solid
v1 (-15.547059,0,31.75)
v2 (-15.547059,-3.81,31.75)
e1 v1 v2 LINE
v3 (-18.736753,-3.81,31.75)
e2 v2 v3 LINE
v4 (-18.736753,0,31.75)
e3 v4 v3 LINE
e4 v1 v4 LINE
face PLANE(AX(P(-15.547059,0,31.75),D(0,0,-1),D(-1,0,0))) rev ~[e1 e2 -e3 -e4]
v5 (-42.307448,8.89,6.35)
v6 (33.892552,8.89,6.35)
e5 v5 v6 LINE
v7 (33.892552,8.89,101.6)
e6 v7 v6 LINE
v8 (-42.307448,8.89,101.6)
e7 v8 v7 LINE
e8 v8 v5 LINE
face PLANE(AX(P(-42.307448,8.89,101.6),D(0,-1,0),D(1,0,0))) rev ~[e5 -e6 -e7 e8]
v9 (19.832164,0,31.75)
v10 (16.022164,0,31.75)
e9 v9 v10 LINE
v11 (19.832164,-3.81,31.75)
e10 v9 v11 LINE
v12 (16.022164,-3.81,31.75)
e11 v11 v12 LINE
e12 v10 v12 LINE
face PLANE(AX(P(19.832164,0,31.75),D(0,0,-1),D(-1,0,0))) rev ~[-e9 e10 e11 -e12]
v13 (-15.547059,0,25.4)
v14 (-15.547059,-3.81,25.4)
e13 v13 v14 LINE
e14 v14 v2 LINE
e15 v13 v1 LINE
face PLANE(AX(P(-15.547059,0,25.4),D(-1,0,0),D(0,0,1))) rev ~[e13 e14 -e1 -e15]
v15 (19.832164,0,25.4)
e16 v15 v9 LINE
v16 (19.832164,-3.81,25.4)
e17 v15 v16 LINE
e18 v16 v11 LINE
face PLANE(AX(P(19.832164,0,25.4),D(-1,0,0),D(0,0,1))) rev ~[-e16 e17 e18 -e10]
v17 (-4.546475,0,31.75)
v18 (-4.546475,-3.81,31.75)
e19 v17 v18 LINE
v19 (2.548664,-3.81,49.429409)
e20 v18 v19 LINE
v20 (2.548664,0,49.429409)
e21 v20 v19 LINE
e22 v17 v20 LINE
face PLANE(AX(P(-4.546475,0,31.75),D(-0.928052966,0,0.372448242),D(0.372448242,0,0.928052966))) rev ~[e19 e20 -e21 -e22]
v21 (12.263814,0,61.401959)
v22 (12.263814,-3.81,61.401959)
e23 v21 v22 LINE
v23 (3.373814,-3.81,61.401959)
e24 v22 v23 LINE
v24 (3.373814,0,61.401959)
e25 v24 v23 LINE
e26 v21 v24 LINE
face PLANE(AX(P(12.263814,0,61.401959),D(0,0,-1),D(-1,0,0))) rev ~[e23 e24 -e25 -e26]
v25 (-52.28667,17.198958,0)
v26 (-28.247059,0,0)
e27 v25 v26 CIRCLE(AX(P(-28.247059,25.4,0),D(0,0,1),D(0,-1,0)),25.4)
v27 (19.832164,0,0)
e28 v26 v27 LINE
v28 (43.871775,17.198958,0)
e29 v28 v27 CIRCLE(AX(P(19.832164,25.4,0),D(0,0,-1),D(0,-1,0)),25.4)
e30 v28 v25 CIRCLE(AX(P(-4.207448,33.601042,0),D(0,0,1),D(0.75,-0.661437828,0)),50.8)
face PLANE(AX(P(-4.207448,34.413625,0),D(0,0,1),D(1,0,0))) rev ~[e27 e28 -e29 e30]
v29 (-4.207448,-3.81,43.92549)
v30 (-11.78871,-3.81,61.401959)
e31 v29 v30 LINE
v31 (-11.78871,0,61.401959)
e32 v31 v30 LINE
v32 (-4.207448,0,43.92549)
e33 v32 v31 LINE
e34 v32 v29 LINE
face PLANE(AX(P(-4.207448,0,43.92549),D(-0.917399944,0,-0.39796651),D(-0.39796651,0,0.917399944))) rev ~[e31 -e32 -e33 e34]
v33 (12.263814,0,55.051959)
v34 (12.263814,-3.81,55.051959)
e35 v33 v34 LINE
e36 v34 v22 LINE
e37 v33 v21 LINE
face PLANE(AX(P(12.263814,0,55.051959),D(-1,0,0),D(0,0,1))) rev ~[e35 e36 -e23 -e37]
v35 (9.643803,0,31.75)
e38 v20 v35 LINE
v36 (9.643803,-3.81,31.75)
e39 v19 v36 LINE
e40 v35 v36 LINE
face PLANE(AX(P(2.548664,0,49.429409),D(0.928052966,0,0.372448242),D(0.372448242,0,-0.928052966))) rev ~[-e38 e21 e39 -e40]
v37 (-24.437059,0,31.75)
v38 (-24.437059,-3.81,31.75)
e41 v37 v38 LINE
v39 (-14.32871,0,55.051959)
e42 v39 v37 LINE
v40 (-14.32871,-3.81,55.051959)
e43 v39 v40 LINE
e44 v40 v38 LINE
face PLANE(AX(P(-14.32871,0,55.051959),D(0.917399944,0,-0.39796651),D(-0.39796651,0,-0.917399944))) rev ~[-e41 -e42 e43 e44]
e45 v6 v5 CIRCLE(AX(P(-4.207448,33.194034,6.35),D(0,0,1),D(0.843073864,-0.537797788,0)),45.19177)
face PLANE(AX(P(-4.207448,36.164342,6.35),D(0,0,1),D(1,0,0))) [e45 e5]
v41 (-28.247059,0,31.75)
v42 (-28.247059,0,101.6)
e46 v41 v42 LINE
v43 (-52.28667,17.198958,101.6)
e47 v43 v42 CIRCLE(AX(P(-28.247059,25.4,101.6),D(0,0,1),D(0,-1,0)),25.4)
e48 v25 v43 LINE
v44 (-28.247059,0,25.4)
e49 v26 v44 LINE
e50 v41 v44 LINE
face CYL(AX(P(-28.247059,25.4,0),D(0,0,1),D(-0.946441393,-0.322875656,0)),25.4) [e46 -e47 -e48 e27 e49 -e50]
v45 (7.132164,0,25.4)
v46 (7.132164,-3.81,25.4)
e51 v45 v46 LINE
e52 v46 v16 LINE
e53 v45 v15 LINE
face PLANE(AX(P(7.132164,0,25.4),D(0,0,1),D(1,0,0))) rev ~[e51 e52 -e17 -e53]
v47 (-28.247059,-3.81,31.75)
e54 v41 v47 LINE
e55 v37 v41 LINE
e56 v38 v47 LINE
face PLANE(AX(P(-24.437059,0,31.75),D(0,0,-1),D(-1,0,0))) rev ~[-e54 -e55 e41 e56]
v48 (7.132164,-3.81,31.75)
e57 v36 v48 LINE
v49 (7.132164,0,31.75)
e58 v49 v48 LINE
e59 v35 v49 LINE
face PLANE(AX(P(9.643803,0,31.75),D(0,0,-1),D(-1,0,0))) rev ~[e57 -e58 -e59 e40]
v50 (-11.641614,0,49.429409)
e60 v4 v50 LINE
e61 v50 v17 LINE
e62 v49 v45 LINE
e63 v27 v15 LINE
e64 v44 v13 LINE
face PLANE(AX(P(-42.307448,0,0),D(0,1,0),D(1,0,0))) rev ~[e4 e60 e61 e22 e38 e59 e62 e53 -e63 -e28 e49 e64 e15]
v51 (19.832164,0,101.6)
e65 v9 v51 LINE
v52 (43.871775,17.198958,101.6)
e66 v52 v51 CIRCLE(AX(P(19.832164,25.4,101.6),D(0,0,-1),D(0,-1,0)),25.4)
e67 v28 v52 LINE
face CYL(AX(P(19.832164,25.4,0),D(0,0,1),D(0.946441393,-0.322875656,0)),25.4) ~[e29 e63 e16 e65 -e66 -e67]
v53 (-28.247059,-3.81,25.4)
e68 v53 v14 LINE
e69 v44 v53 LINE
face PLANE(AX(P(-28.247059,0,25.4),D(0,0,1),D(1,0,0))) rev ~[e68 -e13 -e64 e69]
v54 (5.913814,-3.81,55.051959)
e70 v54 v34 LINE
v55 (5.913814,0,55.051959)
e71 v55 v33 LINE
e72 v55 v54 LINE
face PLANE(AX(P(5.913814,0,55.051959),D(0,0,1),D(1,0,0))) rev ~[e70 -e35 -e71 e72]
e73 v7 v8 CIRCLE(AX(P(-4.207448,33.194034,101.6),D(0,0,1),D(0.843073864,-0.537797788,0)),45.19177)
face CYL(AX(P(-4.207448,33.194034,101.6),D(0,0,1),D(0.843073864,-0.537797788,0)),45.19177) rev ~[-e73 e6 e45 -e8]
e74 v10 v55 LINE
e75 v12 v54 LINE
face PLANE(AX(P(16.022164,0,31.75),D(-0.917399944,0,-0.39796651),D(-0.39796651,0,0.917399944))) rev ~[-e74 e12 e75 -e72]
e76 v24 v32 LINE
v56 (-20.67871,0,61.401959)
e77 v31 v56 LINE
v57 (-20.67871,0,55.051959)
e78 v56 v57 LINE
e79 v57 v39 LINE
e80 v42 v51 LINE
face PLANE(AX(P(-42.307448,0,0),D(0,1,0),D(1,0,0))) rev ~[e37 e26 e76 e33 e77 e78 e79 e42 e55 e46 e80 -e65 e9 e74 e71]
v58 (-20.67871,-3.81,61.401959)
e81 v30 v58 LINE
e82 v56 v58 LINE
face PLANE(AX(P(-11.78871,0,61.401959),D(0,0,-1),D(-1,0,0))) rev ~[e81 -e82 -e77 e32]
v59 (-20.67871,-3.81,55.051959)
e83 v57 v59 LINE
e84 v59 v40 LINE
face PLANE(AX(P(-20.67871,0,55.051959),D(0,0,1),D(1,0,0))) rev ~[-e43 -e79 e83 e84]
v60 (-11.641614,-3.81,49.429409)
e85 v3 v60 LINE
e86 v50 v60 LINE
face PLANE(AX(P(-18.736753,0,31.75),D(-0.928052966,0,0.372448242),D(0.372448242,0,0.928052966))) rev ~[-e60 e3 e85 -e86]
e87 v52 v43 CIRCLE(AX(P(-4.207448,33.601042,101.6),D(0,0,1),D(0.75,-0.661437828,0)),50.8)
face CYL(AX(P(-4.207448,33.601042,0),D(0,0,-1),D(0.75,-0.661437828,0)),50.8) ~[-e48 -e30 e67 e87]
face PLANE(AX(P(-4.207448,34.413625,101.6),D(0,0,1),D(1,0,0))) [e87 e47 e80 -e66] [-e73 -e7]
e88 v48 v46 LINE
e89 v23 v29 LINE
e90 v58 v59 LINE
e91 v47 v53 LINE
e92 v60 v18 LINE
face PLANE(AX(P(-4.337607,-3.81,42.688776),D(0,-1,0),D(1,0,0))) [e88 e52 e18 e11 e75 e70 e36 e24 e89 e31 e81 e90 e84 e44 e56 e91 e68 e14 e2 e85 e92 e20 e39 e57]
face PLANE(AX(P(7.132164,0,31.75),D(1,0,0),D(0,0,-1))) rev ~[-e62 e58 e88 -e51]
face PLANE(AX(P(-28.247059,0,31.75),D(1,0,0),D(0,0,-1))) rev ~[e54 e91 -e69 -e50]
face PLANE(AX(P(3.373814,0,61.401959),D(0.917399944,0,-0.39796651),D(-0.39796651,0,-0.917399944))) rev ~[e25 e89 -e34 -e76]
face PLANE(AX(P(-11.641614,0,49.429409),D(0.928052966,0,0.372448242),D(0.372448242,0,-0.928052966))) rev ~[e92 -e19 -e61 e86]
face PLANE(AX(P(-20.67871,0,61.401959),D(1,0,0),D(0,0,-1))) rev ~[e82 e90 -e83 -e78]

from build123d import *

# Parameters (mm, degrees)
F1_DEPTH = 101.6
F3_DEPTH = 95.25
F4_R     = 25.4
F6_DEPTH = 3.81


# Not quite as in the source:
# - a feature names something its author has since deleted; it is built from what else it names


with BuildPart() as f1:
    # F0 (on Top) → F1 (new body)
    with BuildSketch(Plane.XY):
        with BuildLine():
            ThreePointArc((33.8925523579, 0), (-4.2074476421, 84.4010416505), (-42.3074476421, 0))
            Line((-42.3074476421, 0), (33.8925523579, 0))
        make_face()
    extrude(amount=F1_DEPTH)

    # F2 (on face) → F3 (cut)
    with BuildSketch(Plane.XY.offset(101.6)):
        with BuildLine():
            ThreePointArc((33.8925523579, 8.89), (-4.2074476421, 78.3858036913), (-42.3074476421, 8.89))
            Line((-42.3074476421, 8.89), (33.8925523579, 8.89))
        make_face()
    extrude(amount=-F3_DEPTH, mode=Mode.SUBTRACT)

    # F4
    f4_edges = [f1.edges().sort_by_distance(p)[0] for p in [
        (-42.307448, 0, 50.8),
        (33.892552, 0, 50.8),
    ]]
    fillet(f4_edges, radius=F4_R)

    # F5 (on face) → F6 (join)
    with BuildSketch(Plane.XZ):
        Polygon((-28.2470590334, 31.75), (-28.2470590334, 25.4), (-15.5470590334, 25.4), (-15.5470590334, 31.75), (-18.7367527627, 31.75), (-11.6416137586, 49.4294089978), (-4.5464747545, 31.75), (2.5486642496, 49.4294089978), (9.6438032537, 31.75), (7.1321637492, 31.75), (7.1321637492, 25.4), (19.8321637492, 25.4), (19.8321637492, 31.75), (16.0221637492, 31.75), (5.9138143828, 55.0519585676), (12.2638143828, 55.0519585676), (12.2638143828, 61.4019585676), (3.3738143828, 61.4019585676), (-4.2074476421, 43.9254896419), (-11.7887096669, 61.4019585676), (-20.6787096669, 61.4019585676), (-20.6787096669, 55.0519585676), (-14.3287096669, 55.0519585676), (-24.4370590334, 31.75), align=None)
    extrude(amount=F6_DEPTH)


solid = f1.part
